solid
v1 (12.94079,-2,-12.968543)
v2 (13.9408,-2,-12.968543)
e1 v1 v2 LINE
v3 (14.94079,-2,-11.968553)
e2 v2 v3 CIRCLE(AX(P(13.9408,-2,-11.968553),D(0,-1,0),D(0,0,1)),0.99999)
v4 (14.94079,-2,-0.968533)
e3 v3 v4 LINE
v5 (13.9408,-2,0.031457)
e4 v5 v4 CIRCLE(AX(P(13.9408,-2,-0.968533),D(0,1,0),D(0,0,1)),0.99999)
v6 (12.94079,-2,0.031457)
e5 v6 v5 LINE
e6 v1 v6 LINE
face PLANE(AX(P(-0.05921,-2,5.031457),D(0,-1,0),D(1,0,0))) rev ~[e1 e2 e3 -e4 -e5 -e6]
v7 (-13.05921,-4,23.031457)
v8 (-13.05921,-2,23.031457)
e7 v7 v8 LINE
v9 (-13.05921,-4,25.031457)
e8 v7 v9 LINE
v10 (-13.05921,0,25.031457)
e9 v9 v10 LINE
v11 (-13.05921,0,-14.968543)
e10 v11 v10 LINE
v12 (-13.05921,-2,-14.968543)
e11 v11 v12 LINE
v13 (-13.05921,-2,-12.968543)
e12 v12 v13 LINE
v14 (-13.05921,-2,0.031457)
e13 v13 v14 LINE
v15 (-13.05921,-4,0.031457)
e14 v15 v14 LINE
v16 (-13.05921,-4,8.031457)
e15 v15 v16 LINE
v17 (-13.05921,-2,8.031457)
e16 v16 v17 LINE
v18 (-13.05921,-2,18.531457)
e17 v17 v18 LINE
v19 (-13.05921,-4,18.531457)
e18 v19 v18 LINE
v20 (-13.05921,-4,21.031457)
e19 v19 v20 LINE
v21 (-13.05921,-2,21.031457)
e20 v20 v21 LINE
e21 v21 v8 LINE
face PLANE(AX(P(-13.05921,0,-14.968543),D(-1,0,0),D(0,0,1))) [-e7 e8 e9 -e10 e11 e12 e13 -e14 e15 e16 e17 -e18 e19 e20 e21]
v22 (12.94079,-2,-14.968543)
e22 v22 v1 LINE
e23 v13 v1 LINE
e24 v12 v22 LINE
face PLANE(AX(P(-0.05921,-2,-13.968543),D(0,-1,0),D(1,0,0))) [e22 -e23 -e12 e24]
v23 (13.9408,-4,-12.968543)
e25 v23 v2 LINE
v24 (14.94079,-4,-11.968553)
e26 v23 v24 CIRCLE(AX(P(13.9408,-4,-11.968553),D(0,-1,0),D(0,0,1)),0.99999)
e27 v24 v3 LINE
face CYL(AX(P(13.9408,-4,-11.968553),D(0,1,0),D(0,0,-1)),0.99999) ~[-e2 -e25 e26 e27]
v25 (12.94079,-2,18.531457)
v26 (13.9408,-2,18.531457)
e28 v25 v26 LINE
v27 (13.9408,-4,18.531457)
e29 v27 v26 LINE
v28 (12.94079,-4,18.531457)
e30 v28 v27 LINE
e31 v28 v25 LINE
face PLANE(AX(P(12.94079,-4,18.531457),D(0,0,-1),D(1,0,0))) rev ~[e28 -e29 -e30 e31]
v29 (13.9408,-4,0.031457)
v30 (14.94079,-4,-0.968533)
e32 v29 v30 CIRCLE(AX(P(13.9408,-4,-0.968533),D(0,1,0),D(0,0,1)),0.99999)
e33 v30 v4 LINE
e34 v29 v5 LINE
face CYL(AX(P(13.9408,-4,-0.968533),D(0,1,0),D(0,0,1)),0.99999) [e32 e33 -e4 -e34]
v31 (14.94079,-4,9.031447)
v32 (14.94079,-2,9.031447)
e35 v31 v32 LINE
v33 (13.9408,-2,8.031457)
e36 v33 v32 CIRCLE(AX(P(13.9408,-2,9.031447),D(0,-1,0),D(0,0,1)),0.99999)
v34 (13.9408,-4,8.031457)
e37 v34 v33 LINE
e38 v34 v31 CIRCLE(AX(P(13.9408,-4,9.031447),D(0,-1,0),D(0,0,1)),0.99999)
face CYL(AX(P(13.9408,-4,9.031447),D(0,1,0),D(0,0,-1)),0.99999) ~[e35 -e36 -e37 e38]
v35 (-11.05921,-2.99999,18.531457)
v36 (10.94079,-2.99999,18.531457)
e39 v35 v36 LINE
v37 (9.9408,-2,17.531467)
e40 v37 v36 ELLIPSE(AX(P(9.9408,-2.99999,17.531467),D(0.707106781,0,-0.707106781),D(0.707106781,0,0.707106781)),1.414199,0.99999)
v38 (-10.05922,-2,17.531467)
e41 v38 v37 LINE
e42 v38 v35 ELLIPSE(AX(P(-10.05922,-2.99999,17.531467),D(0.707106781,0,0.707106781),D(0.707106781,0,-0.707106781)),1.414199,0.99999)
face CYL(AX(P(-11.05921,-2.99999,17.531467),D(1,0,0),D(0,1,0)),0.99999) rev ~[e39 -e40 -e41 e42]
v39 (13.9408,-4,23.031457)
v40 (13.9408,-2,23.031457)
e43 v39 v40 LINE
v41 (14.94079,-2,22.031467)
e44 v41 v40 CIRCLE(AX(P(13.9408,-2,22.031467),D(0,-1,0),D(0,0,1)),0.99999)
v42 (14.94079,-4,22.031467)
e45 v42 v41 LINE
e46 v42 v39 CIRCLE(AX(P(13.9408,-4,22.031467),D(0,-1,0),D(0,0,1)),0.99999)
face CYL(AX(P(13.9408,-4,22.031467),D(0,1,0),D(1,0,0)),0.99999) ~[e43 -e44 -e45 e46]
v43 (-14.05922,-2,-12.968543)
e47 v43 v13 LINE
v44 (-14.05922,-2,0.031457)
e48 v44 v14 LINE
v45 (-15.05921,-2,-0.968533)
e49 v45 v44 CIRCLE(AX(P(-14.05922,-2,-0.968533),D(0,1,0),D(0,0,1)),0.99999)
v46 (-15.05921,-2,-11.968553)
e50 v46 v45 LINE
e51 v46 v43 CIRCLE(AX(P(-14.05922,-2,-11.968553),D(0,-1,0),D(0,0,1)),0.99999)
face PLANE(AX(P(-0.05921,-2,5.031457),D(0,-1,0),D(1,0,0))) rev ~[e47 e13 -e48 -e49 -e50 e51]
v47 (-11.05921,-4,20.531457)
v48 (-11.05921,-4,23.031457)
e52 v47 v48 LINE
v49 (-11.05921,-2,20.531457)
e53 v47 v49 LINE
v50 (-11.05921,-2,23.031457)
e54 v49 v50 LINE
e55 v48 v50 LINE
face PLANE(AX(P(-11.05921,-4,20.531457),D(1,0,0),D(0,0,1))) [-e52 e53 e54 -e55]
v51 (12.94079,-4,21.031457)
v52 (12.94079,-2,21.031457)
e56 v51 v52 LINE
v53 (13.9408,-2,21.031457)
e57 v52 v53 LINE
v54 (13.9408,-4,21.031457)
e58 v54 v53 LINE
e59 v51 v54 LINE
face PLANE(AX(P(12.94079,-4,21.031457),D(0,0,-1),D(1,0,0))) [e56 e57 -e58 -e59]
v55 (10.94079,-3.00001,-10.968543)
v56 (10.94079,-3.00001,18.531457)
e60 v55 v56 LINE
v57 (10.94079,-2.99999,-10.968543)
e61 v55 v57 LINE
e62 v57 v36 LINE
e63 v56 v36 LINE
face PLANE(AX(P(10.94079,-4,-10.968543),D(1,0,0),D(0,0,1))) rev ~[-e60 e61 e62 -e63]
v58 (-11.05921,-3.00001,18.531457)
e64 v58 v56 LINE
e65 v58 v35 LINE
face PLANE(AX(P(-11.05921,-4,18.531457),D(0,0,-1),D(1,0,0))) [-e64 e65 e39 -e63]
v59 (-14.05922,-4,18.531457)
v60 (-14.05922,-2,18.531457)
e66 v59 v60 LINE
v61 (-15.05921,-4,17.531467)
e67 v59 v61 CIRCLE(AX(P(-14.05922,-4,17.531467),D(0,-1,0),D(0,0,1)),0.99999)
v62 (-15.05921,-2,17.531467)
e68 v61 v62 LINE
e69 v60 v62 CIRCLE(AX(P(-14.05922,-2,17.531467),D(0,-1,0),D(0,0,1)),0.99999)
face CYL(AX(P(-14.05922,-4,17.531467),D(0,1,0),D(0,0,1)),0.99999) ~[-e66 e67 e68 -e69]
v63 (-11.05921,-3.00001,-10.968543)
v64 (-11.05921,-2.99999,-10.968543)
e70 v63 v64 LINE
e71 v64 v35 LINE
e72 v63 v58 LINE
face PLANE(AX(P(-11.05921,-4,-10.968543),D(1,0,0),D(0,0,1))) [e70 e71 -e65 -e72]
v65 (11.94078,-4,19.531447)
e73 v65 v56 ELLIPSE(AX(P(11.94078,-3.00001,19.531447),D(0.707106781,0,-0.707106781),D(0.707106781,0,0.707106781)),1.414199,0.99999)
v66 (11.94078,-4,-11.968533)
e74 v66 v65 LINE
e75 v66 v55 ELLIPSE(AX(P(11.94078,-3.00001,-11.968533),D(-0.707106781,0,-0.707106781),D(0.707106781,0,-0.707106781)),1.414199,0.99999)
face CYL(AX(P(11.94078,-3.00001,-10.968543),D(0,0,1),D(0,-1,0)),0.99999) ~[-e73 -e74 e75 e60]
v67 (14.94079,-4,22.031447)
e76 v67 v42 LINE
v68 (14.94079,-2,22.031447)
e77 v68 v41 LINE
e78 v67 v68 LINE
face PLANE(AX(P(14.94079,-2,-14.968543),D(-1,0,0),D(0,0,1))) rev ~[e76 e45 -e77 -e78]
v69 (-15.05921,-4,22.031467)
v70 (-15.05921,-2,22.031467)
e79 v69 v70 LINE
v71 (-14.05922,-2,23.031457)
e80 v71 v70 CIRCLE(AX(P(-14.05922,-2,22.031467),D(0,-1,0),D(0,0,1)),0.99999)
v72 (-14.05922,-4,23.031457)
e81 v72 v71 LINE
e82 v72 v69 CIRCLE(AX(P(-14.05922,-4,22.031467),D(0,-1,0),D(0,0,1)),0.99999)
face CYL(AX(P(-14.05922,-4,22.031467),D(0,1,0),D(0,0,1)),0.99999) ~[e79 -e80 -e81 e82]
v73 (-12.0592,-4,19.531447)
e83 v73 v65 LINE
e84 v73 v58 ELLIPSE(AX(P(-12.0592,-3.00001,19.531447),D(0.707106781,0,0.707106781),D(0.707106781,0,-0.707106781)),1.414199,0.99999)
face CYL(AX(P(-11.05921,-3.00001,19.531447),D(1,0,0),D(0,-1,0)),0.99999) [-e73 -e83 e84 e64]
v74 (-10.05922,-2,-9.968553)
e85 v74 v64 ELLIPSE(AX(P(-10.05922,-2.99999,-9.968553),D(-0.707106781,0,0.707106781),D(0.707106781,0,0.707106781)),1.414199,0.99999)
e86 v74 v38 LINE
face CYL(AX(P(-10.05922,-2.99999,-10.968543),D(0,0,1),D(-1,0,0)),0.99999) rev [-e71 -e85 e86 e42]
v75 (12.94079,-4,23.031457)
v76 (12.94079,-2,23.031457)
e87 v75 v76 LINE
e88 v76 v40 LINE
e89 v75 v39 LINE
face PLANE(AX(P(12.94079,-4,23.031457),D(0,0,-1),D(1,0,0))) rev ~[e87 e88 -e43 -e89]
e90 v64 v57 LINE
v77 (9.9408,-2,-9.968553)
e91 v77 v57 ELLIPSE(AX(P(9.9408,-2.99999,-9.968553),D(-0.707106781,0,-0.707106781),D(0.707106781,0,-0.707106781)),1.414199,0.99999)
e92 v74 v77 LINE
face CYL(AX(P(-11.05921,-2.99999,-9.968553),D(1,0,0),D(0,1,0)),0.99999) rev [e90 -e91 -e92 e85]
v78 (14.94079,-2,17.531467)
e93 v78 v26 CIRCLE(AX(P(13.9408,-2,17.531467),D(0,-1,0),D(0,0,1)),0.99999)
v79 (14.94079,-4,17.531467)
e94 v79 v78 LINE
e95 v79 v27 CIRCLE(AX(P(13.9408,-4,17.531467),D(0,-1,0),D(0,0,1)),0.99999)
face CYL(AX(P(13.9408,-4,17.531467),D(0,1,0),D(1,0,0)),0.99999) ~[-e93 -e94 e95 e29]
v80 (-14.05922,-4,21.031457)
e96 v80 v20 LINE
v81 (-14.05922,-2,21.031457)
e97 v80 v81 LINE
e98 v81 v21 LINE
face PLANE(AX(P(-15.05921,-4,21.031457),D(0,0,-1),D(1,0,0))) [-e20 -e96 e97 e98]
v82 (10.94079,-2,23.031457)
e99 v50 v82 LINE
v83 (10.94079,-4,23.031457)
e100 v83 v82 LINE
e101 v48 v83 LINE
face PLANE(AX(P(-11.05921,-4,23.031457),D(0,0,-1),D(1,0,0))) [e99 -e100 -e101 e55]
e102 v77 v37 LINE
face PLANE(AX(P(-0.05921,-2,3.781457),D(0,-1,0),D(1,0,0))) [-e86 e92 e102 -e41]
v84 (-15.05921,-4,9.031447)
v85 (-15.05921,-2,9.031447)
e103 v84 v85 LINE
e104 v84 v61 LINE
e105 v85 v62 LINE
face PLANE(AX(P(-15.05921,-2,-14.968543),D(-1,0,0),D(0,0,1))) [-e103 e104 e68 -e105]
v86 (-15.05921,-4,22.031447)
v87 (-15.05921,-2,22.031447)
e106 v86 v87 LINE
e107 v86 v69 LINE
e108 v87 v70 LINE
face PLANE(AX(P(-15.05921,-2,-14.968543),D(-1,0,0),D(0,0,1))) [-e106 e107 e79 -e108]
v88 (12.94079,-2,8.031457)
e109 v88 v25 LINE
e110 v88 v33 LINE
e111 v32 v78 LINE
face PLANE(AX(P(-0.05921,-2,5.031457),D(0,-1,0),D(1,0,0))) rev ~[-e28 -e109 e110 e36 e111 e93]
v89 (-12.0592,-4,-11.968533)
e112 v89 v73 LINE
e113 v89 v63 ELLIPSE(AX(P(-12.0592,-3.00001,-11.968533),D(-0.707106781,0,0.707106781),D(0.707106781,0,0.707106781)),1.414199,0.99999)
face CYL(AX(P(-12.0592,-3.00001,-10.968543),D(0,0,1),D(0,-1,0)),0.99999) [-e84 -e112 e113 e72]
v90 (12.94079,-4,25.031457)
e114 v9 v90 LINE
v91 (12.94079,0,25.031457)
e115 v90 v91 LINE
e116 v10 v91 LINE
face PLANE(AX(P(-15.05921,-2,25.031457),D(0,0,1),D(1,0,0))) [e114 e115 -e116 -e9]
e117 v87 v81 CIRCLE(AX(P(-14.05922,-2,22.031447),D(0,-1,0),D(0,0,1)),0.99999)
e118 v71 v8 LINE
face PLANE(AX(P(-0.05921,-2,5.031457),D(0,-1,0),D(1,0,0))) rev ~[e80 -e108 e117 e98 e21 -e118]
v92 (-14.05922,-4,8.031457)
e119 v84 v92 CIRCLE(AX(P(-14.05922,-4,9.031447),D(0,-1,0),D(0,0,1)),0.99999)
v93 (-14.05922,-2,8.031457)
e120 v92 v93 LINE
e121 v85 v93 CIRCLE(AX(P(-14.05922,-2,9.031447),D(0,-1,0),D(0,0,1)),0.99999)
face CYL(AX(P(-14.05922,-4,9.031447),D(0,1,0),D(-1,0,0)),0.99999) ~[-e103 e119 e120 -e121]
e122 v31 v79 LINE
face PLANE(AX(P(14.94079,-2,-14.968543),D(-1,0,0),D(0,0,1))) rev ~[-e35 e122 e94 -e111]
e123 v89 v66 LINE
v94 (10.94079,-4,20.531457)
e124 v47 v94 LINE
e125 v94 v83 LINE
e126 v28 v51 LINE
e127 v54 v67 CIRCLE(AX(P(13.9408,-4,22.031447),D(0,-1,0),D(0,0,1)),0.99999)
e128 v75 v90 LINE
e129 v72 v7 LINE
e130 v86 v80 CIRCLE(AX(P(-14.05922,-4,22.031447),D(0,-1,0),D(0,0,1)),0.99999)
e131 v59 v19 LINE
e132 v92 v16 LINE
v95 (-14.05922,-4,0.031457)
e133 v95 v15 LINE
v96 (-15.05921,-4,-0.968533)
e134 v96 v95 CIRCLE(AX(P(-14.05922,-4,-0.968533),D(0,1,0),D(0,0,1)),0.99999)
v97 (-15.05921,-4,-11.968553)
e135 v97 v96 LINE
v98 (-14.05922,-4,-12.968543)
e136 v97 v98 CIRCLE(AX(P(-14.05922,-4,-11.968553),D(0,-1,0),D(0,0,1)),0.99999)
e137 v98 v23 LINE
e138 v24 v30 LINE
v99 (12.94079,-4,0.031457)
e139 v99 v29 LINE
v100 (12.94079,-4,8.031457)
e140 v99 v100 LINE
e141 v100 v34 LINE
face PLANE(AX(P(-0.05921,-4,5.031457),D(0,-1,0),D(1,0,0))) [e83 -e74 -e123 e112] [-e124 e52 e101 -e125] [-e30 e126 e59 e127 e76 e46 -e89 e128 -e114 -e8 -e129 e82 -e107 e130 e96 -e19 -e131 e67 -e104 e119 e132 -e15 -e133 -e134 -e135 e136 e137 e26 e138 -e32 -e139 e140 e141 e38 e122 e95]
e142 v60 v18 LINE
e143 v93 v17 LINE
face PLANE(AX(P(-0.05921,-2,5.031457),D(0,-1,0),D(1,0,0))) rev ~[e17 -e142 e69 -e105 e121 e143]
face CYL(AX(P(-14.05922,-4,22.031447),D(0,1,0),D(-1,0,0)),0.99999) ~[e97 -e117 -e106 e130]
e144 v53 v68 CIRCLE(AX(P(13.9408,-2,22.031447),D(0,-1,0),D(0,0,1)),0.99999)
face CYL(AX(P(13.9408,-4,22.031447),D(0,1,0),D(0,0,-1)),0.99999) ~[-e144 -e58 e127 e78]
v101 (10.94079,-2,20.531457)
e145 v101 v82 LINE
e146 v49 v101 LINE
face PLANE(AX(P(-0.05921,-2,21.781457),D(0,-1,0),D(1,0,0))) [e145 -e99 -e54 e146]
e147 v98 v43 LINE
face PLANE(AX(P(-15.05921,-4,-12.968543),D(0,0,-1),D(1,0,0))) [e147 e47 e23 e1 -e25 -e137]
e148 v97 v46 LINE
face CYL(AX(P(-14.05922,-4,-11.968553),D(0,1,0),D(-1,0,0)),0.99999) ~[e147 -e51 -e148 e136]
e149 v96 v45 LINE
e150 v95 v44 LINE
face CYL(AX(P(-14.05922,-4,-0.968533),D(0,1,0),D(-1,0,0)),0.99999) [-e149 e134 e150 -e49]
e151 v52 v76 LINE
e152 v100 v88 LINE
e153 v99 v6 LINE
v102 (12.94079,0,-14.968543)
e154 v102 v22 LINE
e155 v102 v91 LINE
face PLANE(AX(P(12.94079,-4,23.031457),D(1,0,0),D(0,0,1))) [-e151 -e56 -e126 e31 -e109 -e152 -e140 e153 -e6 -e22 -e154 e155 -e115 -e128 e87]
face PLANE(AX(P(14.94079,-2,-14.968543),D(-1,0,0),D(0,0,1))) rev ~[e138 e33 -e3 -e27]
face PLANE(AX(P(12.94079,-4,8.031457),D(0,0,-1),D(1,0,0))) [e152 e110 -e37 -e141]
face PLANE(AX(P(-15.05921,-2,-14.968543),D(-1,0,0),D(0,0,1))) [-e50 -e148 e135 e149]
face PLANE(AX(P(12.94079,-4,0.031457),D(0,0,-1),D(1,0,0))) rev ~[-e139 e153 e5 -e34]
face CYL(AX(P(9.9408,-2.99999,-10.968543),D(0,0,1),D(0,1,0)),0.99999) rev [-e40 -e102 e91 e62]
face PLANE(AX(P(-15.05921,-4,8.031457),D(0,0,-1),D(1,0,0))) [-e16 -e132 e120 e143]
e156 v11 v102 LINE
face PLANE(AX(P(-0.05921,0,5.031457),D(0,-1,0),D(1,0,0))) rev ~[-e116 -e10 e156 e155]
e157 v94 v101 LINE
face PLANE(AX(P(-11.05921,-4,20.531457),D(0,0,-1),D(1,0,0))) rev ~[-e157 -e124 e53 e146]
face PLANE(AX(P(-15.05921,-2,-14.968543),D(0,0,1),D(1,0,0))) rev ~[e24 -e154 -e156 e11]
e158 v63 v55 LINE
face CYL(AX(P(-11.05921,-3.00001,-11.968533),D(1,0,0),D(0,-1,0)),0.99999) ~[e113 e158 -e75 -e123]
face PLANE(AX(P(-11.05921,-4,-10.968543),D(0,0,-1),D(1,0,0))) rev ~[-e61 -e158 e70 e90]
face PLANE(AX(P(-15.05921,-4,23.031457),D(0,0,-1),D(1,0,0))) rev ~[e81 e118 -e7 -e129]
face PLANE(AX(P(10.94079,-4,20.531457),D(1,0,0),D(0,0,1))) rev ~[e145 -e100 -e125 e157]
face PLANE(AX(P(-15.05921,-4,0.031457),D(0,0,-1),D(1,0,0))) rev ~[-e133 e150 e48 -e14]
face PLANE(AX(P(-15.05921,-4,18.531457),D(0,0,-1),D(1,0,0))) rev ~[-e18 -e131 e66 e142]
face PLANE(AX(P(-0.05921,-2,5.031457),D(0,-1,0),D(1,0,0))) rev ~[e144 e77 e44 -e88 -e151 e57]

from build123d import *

# Parameters (mm, degrees)
F0_W     = 26
F0_H     = 40
F1_DEPTH = 2
F2_W     = 30
F2_H     = 40
F3_DEPTH = 2
F4_W     = 2
F4_H     = 2
F4_H_2   = 2.5
F4_W_2   = 30
F4_W_3   = 22
F4_H_3   = 8
F4_H_4   = 29.5
F5_DEPTH = 2
F6_R     = 0.99999


# Not quite as in the source:
# - a fillet or chamfer is up to 0.001 mm smaller than in the source, because OpenCascade refuses the exact size


with BuildPart() as f1:
    # F0 (on Front) → F1 (new body)
    with BuildSketch(Plane.XZ):
        with Locations((-0.059209764, 5.0314570961)):
            Rectangle(F0_W, F0_H)
    extrude(amount=F1_DEPTH)

    # F2 (on face) → F3 (join)
    with BuildSketch(Plane.XZ.offset(2)):
        with Locations((-0.059209764, 5.0314570961)):
            Rectangle(F2_W, F2_H)
    extrude(amount=F3_DEPTH)

    # F4 (on face) → F5 (cut)
    with BuildSketch(Plane.XZ.offset(4)):
        with Locations((-14.059209764, 24.0314570961)):
            Rectangle(F4_W, F4_H)
        with Locations((13.940790236, 24.0314570961)):
            Rectangle(F4_W, F4_H)
        with Locations((-14.059209764, 19.7814570961)):
            Rectangle(F4_W, F4_H_2)
        with Locations((13.940790236, 19.7814570961)):
            Rectangle(F4_W, F4_H_2)
        with Locations((-0.059209764, -13.9685429039)):
            Rectangle(F4_W_2, F4_H)
        with Locations((-0.059209764, 21.7814570961)):
            Rectangle(F4_W_3, F4_H_2)
        with Locations((-14.059209764, 4.0314570961)):
            Rectangle(F4_W, F4_H_3)
        with Locations((13.940790236, 4.0314570961)):
            Rectangle(F4_W, F4_H_3)
        with Locations((-0.059209764, 3.7814570961)):
            Rectangle(F4_W_3, F4_H_4)
    extrude(amount=-F5_DEPTH, mode=Mode.SUBTRACT)

    # F6 (radius 1 in the source; OpenCascade refuses exactly that, so slightly less here)
    f6_edges = [f1.edges().sort_by_distance(p)[0] for p in [
        (14.94079, -3, 23.031457),
        (14.94079, -3, 21.031457),
        (14.94079, -3, 18.531457),
        (14.94079, -3, -12.968543),
        (-15.05921, -3, -12.968543),
        (-15.05921, -3, 18.531457),
        (-15.05921, -3, 23.031457),
        (-15.05921, -3, 21.031457),
        (-15.05921, -3, 8.031457),
        (-15.05921, -3, 0.031457),
        (14.94079, -3, 8.031457),
        (14.94079, -3, 0.031457),
        (-0.05921, -2, -10.968543),
        (10.94079, -2, 3.781457),
        (-0.05921, -2, 18.531457),
        (-11.05921, -2, 3.781457),
        (-0.05921, -4, 18.531457),
        (-11.05921, -4, 3.781457),
        (-0.05921, -4, -10.968543),
        (10.94079, -4, 3.781457),
    ]]
    fillet(f6_edges, radius=F6_R)


solid = f1.part
